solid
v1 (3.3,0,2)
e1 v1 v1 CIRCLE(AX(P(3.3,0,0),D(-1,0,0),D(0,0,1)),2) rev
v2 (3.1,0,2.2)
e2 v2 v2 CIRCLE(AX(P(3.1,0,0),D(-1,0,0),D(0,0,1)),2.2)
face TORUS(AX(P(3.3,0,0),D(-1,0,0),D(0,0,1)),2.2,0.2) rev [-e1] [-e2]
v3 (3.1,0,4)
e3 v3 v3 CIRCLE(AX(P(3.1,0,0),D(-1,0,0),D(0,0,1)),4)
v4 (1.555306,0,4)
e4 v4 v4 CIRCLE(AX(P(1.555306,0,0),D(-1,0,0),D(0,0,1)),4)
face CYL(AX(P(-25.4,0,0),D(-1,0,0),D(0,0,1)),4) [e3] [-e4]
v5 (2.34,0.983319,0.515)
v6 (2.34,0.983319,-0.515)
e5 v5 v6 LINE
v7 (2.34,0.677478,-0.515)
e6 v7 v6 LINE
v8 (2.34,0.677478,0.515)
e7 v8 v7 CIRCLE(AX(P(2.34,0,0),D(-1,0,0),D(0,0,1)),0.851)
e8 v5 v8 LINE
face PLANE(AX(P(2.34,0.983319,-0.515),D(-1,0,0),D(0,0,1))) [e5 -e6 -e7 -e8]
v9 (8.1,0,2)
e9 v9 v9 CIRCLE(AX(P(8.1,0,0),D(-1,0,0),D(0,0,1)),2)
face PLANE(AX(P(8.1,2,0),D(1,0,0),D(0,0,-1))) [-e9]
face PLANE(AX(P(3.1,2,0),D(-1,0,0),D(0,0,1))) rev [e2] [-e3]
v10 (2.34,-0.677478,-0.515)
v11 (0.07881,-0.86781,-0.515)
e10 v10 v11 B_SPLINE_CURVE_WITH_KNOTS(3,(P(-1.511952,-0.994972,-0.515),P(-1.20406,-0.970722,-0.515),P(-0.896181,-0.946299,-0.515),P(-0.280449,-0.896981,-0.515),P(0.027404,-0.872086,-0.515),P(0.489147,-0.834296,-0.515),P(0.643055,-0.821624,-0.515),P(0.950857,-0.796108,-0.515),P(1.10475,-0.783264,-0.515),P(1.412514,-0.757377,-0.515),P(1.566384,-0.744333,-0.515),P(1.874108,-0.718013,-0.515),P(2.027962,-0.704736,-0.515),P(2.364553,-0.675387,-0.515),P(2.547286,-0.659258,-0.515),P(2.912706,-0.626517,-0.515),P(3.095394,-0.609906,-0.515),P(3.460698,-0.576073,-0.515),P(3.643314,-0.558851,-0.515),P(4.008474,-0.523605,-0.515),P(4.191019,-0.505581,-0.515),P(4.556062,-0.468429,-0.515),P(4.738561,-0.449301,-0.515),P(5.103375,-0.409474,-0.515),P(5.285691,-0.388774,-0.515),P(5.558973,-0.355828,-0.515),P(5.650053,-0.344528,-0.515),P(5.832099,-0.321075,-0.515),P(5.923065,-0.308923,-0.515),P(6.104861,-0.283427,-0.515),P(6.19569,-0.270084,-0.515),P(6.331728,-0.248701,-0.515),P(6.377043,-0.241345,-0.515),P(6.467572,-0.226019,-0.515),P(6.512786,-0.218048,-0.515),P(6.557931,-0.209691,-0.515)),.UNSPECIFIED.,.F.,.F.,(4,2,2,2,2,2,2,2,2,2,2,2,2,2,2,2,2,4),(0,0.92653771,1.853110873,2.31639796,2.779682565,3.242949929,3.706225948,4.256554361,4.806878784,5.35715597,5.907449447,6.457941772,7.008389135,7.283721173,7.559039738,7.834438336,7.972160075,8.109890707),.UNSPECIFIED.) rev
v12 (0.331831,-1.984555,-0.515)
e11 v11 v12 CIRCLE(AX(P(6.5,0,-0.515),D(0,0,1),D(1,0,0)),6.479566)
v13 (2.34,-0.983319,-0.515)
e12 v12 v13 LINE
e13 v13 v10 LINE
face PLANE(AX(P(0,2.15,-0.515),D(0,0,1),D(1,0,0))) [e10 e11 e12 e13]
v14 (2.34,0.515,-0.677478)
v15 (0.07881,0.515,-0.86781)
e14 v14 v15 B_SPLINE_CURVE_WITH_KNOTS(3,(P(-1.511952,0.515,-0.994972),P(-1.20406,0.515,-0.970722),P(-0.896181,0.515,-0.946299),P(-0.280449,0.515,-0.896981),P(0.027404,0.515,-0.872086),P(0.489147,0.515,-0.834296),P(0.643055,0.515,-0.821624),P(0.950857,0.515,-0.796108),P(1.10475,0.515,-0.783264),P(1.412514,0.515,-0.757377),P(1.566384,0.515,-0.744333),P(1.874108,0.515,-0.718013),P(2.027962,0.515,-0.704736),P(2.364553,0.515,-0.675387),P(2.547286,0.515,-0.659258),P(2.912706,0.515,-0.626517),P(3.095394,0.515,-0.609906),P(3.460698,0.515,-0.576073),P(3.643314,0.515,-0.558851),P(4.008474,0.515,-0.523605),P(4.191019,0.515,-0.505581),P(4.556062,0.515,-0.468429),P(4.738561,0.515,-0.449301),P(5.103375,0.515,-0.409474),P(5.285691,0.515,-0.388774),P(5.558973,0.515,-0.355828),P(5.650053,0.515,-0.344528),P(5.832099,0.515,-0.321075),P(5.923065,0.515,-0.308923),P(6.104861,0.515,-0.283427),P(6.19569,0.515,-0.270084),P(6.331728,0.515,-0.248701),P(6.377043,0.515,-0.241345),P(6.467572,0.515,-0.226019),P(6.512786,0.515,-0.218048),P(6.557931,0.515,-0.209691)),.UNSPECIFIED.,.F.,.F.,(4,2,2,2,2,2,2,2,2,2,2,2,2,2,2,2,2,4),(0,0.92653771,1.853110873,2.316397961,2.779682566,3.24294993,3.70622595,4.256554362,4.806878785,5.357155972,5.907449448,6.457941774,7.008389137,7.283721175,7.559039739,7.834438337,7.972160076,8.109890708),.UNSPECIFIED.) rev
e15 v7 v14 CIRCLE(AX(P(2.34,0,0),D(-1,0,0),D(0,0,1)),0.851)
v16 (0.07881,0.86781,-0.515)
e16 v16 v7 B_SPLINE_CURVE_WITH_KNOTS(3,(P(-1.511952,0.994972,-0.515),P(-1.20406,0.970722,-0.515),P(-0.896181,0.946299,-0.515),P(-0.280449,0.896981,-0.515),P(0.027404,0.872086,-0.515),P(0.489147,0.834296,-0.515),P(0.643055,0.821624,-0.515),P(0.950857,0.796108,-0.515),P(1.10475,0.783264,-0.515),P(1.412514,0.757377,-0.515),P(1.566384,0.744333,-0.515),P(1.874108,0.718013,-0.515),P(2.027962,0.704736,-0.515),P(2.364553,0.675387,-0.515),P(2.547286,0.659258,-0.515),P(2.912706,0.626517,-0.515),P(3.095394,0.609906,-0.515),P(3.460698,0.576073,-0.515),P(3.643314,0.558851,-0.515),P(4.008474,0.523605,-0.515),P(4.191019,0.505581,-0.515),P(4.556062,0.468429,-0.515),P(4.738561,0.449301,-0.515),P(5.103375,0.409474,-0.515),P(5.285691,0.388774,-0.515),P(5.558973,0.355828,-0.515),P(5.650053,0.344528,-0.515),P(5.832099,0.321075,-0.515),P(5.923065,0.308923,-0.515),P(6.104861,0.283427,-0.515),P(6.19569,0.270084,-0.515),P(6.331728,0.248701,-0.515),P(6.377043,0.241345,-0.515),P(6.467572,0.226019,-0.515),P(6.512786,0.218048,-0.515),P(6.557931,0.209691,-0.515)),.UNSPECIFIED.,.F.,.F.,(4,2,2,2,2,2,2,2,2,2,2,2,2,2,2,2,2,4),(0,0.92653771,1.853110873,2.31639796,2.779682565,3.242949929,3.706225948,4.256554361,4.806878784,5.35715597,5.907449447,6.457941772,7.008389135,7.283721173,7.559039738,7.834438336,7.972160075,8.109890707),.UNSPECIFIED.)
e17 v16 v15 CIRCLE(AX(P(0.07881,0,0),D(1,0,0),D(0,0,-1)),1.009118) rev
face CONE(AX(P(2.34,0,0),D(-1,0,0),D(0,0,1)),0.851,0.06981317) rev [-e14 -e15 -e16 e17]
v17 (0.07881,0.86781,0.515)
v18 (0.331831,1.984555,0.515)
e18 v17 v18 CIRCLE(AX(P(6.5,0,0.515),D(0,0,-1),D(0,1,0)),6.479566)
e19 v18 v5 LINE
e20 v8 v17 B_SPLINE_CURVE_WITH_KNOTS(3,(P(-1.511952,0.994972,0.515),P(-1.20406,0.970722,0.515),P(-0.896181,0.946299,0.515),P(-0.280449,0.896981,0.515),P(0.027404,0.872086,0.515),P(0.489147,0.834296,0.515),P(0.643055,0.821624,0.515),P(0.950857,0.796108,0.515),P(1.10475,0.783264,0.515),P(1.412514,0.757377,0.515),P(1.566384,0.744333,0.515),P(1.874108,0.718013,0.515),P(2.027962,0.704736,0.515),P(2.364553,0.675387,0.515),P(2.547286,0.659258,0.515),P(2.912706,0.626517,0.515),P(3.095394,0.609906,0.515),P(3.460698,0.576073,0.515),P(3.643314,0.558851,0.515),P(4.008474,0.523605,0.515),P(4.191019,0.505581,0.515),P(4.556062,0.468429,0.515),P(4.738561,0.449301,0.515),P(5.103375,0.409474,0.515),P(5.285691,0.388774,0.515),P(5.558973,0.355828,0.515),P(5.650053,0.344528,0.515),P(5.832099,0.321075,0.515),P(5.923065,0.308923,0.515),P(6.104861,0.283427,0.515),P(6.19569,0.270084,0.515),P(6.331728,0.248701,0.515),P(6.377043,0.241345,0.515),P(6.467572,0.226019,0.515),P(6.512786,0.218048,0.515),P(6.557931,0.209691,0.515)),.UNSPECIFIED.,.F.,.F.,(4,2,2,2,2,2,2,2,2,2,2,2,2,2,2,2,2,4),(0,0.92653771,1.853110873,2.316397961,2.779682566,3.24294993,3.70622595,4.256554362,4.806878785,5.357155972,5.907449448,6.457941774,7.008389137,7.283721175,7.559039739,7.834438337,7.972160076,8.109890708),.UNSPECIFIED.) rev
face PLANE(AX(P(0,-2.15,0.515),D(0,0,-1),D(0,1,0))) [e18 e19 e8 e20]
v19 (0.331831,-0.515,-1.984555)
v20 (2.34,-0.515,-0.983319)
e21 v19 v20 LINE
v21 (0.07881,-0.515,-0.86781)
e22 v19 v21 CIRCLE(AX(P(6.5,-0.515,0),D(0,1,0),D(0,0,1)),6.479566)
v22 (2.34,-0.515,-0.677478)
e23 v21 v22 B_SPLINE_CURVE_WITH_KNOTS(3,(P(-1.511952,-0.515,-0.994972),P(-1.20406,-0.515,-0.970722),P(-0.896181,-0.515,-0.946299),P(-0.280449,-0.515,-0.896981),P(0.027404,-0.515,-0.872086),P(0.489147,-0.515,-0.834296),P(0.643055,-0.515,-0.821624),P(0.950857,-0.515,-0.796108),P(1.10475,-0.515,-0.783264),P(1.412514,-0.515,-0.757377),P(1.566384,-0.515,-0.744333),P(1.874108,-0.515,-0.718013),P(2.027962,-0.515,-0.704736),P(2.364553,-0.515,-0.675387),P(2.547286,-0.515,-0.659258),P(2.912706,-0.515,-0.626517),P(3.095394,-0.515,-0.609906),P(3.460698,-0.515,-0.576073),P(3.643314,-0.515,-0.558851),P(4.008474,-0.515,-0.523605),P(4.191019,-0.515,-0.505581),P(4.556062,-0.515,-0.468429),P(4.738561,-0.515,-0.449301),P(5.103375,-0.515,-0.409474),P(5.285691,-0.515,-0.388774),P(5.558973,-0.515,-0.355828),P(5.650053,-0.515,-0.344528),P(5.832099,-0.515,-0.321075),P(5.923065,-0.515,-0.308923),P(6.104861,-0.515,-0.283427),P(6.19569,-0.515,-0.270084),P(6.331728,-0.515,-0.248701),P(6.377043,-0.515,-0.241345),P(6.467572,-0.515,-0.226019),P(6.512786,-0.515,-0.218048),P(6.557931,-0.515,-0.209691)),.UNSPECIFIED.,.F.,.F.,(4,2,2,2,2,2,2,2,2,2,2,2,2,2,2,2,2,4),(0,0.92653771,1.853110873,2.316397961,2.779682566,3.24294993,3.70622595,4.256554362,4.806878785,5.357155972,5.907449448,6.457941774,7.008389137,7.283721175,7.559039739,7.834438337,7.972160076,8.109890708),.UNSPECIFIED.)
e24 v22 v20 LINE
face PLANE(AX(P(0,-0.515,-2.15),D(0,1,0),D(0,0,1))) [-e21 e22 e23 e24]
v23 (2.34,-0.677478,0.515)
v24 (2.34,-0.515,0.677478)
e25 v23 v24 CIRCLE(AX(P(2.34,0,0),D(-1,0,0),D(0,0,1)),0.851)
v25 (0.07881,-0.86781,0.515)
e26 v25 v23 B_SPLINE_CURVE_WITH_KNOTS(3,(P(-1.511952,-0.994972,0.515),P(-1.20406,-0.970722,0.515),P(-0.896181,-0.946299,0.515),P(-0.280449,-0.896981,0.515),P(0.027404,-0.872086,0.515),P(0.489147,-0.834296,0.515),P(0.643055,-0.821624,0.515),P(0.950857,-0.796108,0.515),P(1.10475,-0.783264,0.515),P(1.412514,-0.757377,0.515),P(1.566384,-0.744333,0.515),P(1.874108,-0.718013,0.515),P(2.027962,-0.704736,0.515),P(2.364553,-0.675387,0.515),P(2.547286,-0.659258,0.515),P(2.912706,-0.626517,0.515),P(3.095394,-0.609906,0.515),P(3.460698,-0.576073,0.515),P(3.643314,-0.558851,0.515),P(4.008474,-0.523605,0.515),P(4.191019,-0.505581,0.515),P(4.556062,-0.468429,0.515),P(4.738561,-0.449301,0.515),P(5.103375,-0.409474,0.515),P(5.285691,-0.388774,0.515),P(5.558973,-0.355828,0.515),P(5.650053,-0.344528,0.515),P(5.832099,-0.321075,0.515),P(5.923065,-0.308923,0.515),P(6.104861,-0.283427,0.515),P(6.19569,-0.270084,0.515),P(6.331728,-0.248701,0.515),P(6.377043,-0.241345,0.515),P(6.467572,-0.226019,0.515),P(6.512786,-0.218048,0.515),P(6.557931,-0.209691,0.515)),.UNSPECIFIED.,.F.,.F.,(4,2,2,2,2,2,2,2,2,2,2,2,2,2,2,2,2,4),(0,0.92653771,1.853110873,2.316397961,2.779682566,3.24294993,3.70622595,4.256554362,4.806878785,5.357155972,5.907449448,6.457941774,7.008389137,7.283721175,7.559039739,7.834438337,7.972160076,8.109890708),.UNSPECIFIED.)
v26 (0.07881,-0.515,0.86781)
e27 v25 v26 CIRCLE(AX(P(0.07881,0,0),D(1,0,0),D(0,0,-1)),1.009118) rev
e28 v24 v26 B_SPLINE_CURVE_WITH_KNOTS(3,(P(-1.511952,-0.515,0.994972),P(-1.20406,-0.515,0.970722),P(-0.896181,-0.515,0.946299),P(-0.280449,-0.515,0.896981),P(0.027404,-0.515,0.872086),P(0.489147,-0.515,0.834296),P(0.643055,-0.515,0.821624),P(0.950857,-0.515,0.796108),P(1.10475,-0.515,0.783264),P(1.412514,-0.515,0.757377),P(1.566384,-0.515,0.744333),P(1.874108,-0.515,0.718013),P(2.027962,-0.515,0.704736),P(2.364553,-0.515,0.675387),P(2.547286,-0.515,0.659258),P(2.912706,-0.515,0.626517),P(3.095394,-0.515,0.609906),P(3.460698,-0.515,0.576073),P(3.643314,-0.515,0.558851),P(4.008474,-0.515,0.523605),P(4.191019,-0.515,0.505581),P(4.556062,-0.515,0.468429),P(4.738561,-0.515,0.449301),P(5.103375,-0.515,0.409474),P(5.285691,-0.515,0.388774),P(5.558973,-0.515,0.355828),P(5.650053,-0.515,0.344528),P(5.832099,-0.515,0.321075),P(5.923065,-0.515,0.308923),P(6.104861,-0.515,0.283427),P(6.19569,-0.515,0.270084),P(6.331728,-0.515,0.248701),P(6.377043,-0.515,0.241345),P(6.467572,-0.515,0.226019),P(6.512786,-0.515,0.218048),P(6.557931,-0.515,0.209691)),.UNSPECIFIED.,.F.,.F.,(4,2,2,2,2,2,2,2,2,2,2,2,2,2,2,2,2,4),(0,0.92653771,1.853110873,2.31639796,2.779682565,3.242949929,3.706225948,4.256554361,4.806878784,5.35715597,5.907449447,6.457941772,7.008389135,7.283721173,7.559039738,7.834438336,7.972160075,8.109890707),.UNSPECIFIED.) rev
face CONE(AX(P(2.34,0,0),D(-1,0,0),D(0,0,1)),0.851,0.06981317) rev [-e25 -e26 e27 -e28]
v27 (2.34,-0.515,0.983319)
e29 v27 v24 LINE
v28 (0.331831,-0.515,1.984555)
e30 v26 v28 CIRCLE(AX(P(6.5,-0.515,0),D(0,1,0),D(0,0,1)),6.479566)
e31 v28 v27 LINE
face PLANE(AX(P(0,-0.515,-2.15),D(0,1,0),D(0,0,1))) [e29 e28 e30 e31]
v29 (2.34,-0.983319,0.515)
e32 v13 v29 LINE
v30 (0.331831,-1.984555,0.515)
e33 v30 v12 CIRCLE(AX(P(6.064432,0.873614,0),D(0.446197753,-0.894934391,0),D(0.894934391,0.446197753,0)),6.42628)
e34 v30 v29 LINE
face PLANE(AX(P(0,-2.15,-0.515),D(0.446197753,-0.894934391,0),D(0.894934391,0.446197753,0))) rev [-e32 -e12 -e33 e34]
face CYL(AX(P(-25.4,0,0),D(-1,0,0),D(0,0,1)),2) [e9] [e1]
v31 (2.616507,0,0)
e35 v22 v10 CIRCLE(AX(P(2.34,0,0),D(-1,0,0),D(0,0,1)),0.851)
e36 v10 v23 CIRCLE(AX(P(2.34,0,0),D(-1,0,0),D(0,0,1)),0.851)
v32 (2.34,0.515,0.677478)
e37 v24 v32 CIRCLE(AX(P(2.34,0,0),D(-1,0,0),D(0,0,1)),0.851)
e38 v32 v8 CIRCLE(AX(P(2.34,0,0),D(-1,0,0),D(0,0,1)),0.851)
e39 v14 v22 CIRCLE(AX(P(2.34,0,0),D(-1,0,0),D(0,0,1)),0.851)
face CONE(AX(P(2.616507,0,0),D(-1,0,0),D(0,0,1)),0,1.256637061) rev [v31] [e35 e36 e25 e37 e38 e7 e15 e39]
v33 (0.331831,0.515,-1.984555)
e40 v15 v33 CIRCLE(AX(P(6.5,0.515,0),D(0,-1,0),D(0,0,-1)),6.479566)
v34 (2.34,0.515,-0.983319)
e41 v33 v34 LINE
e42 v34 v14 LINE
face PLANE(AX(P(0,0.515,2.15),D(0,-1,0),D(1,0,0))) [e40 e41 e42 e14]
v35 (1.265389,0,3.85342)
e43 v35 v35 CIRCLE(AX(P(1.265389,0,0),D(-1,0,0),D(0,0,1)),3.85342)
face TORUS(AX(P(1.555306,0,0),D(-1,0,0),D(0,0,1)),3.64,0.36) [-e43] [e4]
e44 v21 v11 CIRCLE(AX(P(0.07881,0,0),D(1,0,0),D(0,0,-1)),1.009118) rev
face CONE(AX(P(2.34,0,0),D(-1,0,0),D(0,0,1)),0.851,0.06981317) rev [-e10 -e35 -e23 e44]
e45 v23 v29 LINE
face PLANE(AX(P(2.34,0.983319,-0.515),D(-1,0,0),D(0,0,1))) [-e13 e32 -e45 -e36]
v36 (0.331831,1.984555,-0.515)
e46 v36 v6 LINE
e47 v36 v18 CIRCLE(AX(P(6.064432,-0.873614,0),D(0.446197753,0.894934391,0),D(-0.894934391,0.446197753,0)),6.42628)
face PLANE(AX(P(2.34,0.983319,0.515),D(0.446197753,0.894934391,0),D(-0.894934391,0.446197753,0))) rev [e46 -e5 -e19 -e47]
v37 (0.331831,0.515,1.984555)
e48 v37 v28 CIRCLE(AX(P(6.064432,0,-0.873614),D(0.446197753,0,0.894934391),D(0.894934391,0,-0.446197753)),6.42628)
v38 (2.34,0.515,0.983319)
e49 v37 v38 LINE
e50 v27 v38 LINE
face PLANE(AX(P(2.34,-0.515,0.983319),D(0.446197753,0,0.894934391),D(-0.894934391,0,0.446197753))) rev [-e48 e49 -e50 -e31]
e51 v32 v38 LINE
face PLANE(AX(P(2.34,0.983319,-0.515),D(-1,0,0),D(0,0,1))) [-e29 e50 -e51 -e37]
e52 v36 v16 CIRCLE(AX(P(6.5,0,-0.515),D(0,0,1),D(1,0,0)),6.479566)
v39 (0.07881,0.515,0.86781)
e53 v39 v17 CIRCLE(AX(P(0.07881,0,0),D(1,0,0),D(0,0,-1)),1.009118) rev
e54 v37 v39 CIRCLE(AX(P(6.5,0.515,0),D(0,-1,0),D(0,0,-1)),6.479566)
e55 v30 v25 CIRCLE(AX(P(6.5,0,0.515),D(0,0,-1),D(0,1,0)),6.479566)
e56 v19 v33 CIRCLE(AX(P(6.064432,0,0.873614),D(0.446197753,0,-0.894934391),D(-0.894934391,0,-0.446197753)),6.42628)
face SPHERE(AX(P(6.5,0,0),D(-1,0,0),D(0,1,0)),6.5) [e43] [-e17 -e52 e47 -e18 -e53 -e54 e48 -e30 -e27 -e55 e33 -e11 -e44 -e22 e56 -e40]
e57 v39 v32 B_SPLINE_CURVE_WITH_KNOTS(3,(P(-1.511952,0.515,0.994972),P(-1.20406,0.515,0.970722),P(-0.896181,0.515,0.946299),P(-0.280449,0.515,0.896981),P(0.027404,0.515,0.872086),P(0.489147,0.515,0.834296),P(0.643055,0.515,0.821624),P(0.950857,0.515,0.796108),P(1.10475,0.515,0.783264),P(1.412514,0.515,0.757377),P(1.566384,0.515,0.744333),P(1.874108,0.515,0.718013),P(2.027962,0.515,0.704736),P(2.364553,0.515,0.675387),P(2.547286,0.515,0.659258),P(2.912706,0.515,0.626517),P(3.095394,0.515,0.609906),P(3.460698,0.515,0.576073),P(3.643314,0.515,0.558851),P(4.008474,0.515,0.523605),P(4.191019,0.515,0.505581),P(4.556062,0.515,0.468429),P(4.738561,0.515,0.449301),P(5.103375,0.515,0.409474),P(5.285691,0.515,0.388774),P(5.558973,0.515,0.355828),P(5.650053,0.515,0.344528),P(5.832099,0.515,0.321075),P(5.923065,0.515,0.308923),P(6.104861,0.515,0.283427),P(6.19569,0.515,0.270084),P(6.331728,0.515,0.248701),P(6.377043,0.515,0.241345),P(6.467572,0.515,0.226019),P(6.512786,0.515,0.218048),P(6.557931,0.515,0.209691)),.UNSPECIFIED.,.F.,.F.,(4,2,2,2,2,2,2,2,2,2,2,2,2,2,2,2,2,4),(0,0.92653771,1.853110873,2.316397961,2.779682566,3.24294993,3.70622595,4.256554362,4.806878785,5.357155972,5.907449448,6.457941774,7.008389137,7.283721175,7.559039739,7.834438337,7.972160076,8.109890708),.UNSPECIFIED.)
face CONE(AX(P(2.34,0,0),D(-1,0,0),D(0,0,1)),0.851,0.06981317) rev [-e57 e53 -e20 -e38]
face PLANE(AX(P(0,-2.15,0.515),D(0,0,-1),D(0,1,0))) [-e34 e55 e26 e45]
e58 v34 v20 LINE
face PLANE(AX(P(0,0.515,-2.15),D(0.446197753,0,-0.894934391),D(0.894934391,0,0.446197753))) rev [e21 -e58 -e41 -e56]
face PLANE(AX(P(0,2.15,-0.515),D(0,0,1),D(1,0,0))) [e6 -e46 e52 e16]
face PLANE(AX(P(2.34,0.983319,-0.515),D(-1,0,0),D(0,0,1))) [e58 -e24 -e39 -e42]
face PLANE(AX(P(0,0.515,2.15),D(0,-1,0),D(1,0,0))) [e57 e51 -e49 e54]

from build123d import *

# Parameters (mm, degrees)
RECPAT_COUNT = 2
RECPAT_ANGLE = 90


with BuildPart() as part:
    # Fillet1: read off the stored shape, not the designer's step
    # Fillet1 outline → Fillet1 (revolve)
    with BuildSketch(Plane.YX):
        with BuildLine():
            Line((2, 3.3), (2, 8.1))
            Line((2, 8.1), (0, 8.1))
            Line((0, 8.1), (0, 0))
            ThreePointArc((0, 0), (2.027933458, 0.324444488), (3.853420198, 1.265388956))
            ThreePointArc((3.853420198, 1.265388956), (3.961271902, 1.392873227), (4, 1.555305874))
            Line((4, 1.555305874), (4, 3.1))
            Line((4, 3.1), (2.2, 3.1))
            ThreePointArc((2.2, 3.1), (2.058578644, 3.158578644), (2, 3.3))
        make_face()
    revolve(axis=Axis((0, 0, 0), (1, 0, 0)))

    # Sketch3 → Recess section 0
    with BuildSketch(Plane(origin=(0, 0, 0), x_dir=(0, 0, -1), z_dir=(1, 0, 0))):
        with BuildLine():
            Line((0.515, -2.15), (-0.515, -2.15))
            Line((-0.515, -2.15), (-0.515, 2.15))
            Line((-0.515, 2.15), (0.515, 2.15))
            Line((0.515, 2.15), (0.515, -2.15))
        make_face()
    # Sketch4 → Recess section 1
    with BuildSketch(Plane(origin=(2.34, 0, 0), x_dir=(0, 0, -1), z_dir=(1, 0, 0))):
        with BuildLine():
            Line((0.515, -0.983319232), (-0.515, -0.983319232))
            Line((-0.515, -0.983319232), (-0.515, 0.983319232))
            Line((-0.515, 0.983319232), (0.515, 0.983319232))
            Line((0.515, 0.983319232), (0.515, -0.983319232))
        make_face()
    recess = loft(mode=Mode.SUBTRACT)

    # RecPat: Recess ×2 about axis
    recpat_axis = Axis((0, 0, 0), (1, 0, 0))
    for i in range(1, RECPAT_COUNT):
        add(recess.rotate(recpat_axis, i * RECPAT_ANGLE / (RECPAT_COUNT - 1)), mode=Mode.SUBTRACT)

    # RecCorSke → RecessCore (revolve, cut)
    with BuildSketch(Plane.XY, mode=Mode.PRIVATE) as recesscore_sk:
        Polygon((0, 0), (0, 1.01462874), (2.34, 0.851), (2.616506661, 0), align=None)
    revolve(recesscore_sk.sketch.rotate(Axis((-3.175, 0, 0), (1, 0, 0)), 90), axis=Axis((-3.175, 0, 0), (1, 0, 0)), mode=Mode.SUBTRACT)


solid = part.part
